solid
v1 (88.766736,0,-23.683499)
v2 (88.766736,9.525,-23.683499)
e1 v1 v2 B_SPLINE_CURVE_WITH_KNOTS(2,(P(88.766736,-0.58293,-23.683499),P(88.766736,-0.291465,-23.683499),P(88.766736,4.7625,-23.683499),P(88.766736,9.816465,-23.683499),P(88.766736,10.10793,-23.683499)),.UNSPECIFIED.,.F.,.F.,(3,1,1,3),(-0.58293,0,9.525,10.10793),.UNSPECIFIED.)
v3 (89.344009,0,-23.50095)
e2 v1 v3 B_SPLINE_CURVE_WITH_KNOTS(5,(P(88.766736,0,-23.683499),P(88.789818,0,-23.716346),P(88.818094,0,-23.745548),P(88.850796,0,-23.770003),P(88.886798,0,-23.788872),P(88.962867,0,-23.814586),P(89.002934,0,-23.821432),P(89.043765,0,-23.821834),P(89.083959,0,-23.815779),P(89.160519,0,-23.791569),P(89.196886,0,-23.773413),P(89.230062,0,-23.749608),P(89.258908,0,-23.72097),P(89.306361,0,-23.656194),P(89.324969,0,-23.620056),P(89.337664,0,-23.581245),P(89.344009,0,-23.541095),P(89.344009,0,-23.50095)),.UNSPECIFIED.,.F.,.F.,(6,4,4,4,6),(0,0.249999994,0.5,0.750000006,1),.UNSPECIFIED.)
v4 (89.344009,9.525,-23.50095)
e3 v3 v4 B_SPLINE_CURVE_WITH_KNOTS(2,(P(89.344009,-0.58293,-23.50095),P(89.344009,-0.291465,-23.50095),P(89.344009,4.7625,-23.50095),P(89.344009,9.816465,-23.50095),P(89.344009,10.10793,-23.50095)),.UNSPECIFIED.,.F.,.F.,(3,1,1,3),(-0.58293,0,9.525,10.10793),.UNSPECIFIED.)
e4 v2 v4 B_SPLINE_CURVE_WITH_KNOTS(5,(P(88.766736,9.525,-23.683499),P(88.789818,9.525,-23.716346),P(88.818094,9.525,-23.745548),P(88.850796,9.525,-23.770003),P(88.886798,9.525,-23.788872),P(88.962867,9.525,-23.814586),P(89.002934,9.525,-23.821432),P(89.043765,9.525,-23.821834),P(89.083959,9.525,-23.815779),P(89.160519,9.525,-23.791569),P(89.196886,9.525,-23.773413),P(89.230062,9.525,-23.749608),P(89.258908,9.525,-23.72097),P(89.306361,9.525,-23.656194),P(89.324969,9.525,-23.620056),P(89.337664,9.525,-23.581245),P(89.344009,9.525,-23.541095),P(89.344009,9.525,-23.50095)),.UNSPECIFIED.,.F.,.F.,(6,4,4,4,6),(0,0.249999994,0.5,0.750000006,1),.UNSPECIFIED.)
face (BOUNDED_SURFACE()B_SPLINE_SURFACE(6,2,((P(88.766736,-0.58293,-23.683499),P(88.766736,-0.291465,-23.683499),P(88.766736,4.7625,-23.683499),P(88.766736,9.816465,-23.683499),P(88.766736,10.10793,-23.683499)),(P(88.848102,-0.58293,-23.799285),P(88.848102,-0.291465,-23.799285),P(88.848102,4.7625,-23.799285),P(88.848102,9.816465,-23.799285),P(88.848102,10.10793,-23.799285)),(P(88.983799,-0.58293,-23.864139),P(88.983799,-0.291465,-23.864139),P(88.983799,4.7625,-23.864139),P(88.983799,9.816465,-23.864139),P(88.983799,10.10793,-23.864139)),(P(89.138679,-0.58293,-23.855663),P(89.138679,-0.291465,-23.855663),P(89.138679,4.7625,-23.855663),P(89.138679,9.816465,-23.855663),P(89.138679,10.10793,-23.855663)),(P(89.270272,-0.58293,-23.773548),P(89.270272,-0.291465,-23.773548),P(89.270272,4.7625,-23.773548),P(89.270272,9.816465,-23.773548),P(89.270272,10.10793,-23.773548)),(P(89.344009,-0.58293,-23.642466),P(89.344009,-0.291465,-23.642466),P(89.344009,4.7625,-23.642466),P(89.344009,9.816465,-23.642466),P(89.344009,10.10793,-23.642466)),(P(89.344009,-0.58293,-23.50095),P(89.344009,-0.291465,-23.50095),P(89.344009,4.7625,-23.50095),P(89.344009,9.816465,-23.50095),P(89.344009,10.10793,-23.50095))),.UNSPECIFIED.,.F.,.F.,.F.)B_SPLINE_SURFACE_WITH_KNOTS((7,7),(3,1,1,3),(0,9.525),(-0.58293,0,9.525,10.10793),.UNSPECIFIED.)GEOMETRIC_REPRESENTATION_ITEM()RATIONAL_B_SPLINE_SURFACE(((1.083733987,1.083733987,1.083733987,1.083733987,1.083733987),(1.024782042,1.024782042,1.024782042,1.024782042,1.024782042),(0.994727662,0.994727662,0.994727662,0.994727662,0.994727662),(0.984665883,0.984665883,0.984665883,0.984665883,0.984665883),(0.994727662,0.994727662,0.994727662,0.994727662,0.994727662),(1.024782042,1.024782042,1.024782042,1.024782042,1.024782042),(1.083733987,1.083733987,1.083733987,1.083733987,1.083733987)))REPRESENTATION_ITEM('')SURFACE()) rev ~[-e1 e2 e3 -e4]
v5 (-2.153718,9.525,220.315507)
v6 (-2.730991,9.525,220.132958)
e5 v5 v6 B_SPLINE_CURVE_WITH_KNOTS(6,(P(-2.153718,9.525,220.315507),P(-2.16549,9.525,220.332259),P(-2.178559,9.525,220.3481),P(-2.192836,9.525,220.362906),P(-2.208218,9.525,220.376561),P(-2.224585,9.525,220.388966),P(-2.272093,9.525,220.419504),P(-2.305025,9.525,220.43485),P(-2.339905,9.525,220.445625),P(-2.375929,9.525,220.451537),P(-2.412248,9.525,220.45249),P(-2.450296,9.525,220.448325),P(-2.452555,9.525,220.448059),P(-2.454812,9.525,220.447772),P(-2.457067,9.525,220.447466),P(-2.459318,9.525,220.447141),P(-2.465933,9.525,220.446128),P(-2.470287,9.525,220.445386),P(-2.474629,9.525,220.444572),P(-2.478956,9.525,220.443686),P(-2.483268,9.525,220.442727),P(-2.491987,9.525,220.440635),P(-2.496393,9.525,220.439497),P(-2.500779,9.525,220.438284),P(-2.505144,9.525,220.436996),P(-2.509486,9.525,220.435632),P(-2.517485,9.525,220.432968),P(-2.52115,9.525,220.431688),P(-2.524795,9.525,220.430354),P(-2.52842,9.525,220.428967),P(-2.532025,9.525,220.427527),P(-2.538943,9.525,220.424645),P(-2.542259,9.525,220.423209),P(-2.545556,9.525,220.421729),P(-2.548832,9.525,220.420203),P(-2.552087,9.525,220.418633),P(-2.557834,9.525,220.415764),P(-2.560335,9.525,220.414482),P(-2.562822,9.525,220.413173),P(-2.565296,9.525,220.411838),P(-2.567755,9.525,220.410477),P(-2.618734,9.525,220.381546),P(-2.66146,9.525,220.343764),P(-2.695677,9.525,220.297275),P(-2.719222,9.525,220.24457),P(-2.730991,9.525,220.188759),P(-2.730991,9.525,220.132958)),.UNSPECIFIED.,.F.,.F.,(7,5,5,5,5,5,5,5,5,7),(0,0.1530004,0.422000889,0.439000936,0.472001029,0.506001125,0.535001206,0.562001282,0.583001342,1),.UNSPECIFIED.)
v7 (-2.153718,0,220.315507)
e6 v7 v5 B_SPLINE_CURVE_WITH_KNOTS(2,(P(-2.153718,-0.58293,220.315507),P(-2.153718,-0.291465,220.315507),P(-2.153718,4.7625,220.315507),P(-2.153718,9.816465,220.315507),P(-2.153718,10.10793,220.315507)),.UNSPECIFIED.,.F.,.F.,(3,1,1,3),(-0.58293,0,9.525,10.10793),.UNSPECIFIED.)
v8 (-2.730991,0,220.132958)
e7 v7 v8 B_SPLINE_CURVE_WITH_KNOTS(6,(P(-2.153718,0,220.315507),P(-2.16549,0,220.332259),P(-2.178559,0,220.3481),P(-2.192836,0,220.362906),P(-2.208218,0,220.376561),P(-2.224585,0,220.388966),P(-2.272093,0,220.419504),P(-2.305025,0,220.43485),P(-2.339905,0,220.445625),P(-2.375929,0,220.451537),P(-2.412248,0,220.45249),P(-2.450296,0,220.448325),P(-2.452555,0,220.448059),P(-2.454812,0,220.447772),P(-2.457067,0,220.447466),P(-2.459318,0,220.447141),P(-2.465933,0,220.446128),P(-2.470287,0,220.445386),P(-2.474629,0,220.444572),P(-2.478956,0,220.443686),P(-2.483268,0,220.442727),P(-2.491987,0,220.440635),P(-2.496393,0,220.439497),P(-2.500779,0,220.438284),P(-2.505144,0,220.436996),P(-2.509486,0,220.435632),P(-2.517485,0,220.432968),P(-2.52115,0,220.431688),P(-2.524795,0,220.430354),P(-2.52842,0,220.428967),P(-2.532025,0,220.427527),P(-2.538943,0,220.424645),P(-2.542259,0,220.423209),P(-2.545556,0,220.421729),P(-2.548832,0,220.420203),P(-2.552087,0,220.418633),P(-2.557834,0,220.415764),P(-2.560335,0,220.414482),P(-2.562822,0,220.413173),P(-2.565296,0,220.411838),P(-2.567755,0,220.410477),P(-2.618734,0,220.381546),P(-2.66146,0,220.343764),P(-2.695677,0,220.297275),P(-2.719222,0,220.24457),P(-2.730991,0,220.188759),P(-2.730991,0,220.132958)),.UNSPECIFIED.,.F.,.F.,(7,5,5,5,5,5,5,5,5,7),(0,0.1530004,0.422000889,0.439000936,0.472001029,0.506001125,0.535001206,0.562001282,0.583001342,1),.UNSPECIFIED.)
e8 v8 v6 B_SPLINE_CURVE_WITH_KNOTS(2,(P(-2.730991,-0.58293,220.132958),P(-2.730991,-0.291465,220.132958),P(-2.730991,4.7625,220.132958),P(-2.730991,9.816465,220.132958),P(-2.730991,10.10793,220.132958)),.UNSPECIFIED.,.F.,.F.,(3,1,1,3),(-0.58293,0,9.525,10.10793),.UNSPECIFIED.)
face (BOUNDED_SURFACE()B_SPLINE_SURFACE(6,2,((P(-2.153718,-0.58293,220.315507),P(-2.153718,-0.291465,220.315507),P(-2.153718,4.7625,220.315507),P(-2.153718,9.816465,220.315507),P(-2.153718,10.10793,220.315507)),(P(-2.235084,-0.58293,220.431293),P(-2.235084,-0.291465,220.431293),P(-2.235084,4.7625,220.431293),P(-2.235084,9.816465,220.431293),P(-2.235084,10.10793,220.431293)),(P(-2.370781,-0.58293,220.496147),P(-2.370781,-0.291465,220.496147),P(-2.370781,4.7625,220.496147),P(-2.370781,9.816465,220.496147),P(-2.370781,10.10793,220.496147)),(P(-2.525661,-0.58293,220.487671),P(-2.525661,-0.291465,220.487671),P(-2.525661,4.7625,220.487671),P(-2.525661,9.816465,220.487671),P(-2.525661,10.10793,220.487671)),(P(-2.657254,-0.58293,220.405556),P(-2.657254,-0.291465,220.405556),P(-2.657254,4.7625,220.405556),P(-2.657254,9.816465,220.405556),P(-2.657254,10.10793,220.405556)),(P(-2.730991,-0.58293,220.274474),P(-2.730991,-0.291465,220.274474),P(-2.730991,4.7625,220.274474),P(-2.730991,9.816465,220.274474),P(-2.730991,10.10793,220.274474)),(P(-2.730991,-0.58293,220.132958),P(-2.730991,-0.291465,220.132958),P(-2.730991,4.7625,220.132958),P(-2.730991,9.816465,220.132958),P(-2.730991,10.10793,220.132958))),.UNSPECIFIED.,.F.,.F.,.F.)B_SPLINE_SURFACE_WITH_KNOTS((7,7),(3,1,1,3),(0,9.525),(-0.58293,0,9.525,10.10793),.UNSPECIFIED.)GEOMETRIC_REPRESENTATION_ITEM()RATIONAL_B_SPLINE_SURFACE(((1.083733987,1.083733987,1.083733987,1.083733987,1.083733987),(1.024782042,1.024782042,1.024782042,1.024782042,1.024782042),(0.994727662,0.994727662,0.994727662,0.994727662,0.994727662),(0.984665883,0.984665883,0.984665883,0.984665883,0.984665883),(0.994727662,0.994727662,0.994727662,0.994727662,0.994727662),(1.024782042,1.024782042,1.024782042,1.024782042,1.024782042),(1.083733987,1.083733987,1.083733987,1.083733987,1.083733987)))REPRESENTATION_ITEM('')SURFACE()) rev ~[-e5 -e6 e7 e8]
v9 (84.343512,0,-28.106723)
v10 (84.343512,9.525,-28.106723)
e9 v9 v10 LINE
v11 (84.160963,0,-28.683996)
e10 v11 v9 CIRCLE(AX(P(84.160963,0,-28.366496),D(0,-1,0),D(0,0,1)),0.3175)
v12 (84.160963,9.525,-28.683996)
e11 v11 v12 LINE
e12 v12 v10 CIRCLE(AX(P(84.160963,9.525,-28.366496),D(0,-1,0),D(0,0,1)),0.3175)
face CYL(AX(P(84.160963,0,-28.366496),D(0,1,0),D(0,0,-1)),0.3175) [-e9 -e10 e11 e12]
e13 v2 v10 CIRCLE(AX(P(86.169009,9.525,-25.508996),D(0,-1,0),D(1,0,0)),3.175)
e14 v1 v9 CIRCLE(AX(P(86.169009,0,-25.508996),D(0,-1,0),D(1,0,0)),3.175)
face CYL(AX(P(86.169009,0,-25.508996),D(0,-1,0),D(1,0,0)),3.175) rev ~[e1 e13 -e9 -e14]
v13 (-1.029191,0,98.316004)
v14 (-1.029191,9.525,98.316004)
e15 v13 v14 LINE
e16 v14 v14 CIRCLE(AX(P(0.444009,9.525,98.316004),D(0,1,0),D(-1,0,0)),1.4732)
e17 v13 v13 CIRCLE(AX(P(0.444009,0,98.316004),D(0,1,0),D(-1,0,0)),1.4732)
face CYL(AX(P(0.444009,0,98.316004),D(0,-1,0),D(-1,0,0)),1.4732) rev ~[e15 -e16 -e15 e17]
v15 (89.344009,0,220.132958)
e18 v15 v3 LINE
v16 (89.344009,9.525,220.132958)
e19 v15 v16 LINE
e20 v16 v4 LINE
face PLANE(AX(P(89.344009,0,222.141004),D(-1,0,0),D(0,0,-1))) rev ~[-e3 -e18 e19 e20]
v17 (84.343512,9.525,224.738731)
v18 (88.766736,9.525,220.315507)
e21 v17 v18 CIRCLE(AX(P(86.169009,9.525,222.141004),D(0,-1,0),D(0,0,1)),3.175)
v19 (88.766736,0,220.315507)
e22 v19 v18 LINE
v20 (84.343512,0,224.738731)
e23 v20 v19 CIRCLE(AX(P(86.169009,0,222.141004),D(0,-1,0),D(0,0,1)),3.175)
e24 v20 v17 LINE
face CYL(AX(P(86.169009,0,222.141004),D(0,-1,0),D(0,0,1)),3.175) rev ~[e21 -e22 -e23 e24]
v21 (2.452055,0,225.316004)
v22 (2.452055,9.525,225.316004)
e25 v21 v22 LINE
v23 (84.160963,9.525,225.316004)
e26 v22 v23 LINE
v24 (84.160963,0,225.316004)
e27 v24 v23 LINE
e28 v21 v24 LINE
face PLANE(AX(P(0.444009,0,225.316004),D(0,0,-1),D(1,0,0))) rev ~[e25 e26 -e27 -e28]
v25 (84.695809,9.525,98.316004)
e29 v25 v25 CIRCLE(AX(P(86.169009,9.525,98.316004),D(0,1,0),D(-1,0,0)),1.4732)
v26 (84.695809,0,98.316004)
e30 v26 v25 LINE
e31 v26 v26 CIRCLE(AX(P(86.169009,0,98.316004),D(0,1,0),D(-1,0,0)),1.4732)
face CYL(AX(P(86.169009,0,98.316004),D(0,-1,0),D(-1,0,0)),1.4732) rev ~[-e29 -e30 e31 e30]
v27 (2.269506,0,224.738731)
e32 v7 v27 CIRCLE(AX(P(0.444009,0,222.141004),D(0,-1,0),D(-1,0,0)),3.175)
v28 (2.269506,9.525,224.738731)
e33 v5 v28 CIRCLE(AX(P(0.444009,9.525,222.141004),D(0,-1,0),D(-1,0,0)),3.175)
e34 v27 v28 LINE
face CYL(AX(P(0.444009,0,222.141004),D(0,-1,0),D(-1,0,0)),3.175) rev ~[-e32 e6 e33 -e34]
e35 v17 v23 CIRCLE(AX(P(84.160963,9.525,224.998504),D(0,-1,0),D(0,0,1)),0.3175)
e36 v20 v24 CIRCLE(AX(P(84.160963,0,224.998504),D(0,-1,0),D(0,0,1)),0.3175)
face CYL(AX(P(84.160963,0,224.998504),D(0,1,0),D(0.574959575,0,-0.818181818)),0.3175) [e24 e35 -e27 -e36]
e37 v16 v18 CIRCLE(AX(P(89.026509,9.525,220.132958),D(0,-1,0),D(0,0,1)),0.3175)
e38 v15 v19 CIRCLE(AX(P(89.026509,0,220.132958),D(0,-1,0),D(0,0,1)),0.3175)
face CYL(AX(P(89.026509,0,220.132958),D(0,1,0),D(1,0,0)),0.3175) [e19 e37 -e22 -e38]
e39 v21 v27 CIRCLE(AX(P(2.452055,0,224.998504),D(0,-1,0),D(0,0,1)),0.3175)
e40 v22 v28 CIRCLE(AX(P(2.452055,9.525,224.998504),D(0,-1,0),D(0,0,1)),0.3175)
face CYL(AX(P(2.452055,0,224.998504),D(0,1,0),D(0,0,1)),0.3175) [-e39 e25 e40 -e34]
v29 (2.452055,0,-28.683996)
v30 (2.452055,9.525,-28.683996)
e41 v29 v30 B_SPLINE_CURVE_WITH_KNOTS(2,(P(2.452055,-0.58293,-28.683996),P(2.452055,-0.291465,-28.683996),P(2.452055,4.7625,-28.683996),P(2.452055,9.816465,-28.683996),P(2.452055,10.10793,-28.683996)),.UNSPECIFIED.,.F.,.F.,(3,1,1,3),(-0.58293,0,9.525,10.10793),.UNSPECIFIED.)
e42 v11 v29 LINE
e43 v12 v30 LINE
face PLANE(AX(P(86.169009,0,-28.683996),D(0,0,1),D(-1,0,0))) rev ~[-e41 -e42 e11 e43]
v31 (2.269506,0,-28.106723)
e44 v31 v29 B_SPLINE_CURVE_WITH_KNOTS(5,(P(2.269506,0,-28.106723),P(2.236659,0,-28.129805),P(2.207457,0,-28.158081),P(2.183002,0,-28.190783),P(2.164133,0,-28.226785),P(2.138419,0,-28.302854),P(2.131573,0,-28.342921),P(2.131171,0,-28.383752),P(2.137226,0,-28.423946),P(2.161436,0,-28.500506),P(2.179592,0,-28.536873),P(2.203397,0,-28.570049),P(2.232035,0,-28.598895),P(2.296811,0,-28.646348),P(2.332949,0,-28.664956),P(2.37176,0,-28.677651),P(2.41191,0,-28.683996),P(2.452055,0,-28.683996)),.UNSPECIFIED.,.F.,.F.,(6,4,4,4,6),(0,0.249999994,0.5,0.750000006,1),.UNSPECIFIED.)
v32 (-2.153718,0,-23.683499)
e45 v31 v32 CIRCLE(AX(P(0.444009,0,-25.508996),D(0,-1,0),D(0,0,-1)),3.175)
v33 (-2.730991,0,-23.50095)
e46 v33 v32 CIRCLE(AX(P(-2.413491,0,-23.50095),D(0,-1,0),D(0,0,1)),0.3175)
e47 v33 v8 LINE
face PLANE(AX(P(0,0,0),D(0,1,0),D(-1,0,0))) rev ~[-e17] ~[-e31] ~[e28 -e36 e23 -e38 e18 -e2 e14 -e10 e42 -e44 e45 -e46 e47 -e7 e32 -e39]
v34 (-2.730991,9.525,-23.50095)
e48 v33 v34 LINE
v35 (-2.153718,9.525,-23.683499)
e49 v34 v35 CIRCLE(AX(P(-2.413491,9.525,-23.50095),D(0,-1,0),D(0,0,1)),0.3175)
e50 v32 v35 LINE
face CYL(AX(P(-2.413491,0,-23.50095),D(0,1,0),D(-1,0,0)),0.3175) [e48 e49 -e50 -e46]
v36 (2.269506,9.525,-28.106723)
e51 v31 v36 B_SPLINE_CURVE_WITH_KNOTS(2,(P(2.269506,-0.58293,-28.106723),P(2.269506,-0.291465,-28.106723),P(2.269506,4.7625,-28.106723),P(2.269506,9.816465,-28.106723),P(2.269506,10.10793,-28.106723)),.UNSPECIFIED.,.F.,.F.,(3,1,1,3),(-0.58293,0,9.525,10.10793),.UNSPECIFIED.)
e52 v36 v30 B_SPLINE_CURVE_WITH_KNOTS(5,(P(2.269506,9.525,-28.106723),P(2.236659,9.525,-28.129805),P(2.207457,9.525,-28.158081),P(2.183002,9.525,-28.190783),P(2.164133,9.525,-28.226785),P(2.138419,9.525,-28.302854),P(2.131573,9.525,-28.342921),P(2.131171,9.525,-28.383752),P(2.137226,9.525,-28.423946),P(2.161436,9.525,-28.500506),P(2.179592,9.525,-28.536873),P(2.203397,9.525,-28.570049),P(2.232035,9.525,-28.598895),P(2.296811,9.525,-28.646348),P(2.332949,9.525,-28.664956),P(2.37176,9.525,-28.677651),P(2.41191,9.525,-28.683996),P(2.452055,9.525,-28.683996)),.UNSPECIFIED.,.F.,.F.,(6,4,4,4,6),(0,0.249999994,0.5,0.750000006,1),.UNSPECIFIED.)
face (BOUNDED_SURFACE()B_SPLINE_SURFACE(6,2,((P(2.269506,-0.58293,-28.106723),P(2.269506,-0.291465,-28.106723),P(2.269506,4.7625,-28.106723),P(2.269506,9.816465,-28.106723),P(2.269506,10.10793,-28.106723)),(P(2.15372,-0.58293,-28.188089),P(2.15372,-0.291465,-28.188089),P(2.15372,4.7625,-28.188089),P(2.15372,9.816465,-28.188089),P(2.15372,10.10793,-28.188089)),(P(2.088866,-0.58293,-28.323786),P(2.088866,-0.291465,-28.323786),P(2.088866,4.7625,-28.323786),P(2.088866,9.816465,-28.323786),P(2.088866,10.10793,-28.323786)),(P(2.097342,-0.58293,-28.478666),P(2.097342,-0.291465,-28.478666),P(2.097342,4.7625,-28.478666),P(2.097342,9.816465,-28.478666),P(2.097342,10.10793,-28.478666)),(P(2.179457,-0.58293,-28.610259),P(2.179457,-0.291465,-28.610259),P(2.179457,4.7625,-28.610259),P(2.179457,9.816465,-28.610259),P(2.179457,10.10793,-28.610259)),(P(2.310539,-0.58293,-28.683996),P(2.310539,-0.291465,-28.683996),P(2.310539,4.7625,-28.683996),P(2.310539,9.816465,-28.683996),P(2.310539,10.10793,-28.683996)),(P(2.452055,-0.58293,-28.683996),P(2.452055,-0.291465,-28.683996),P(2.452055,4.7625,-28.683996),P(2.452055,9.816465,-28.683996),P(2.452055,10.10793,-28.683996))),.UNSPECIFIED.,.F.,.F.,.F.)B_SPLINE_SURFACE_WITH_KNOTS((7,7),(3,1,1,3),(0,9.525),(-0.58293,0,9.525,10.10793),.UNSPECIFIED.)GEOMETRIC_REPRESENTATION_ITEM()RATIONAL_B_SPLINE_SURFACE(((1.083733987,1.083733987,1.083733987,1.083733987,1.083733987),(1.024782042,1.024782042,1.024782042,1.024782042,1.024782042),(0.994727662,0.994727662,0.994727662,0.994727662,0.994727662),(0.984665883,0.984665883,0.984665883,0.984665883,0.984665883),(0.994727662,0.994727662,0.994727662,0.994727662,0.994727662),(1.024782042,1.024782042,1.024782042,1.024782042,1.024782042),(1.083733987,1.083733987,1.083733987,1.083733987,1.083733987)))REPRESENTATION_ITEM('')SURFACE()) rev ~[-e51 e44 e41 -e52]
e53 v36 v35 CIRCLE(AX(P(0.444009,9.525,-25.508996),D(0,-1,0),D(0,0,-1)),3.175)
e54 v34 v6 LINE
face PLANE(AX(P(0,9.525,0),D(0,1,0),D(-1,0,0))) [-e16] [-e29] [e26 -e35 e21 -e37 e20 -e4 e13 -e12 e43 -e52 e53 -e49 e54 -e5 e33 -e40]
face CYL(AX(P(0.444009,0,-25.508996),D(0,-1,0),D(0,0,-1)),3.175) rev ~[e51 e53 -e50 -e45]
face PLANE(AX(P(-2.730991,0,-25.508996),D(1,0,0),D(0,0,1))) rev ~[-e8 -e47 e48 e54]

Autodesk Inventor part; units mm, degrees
ref_plane "YZ Plane" through (0, 0, 0) normal (1, 0, 0) x (0, 1, 0)
ref_plane "XZ Plane" through (0, 0, 0) normal (0, 1, 0) x (-1, 0, 0)
ref_plane "XY Plane" through (0, 0, 0) normal (0, 0, 1) x (1, 0, 0)
sketch "Sketch1" plane through (0, 0, 0) normal (0, 1, 0) x (-1, 0, 0)
  line L0 (-0.444009, 225.316004) -> (-86.169009, 225.316004)
  line L1 (-89.344009, 222.141004) -> (-89.344009, -25.508996)
  line L2 (-86.169009, -28.683996) -> (-0.444009, -28.683996)
  line L3 (2.730991, -25.508996) -> (2.730991, 222.141004)
  arc A0 (-86.169009, -28.683996) -> (-89.344009, -25.508996) centre (-86.169009, -25.508996) ccw
  arc A1 (-0.444009, 225.316004) -> (2.730991, 222.141004) centre (-0.444009, 222.141004) ccw
  arc A2 (-89.344009, 222.141004) -> (-86.169009, 225.316004) centre (-86.169009, 222.141004) ccw
  arc A3 (2.730991, -25.508996) -> (-0.444009, -28.683996) centre (-0.444009, -25.508996) ccw
  circle A4 centre (-0.444009, 98.316004) radius 1.4732
  circle A5 centre (-86.169009, 98.316004) radius 1.4732
  point P0 (0, 0)
  dimension "d2" = 6.35
  dimension "d3" = 6.35
  dimension "d4" = 6.35
  dimension "d5" = 6.35
  dimension "d7" = 2.9464
  dimension "d8" = 2.9464
sketch "Sketch1 outline for Extrusion1" plane through (0, 0, 0) normal (0, 1, 0) x (-1, 0, 0)
  arc A0 (2.730991, 222.141004) -> (-0.444009, 225.316004) centre (-0.444009, 222.141004) cw
  line L0 (2.730991, -25.508996) -> (2.730991, 222.141004)
  line L1 (-0.444009, 225.316004) -> (-86.169009, 225.316004)
  arc A1 (-0.444009, -28.683996) -> (2.730991, -25.508996) centre (-0.444009, -25.508996) cw
  arc A2 (-86.169009, 225.316004) -> (-89.344009, 222.141004) centre (-86.169009, 222.141004) cw
  line L2 (-86.169009, -28.683996) -> (-0.444009, -28.683996)
  line L3 (-89.344009, 222.141004) -> (-89.344009, -25.508996)
  arc A3 (-89.344009, -25.508996) -> (-86.169009, -28.683996) centre (-86.169009, -25.508996) cw
  circle A4 centre (-86.169009, 98.316004) radius 1.4732
  circle A5 centre (-0.444009, 98.316004) radius 1.4732
extrude "Extrusion1" add sketch "Sketch1 outline for Extrusion1" along normal blind 9.525
fillet "Fillet1" radius 0.3175 8 edges at (86.169, 4.7625, 225.316) (89.344, 4.7625, 222.141) (0.444, 4.7625, 225.316) (-2.731, 4.7625, 222.141) (-2.731, 4.7625, -25.509) (0.444, 4.7625, -28.684) (86.169, 4.7625, -28.684) (89.344, 4.7625, -25.509)
properties part number "Mid" material "Wood (Walnut)"
